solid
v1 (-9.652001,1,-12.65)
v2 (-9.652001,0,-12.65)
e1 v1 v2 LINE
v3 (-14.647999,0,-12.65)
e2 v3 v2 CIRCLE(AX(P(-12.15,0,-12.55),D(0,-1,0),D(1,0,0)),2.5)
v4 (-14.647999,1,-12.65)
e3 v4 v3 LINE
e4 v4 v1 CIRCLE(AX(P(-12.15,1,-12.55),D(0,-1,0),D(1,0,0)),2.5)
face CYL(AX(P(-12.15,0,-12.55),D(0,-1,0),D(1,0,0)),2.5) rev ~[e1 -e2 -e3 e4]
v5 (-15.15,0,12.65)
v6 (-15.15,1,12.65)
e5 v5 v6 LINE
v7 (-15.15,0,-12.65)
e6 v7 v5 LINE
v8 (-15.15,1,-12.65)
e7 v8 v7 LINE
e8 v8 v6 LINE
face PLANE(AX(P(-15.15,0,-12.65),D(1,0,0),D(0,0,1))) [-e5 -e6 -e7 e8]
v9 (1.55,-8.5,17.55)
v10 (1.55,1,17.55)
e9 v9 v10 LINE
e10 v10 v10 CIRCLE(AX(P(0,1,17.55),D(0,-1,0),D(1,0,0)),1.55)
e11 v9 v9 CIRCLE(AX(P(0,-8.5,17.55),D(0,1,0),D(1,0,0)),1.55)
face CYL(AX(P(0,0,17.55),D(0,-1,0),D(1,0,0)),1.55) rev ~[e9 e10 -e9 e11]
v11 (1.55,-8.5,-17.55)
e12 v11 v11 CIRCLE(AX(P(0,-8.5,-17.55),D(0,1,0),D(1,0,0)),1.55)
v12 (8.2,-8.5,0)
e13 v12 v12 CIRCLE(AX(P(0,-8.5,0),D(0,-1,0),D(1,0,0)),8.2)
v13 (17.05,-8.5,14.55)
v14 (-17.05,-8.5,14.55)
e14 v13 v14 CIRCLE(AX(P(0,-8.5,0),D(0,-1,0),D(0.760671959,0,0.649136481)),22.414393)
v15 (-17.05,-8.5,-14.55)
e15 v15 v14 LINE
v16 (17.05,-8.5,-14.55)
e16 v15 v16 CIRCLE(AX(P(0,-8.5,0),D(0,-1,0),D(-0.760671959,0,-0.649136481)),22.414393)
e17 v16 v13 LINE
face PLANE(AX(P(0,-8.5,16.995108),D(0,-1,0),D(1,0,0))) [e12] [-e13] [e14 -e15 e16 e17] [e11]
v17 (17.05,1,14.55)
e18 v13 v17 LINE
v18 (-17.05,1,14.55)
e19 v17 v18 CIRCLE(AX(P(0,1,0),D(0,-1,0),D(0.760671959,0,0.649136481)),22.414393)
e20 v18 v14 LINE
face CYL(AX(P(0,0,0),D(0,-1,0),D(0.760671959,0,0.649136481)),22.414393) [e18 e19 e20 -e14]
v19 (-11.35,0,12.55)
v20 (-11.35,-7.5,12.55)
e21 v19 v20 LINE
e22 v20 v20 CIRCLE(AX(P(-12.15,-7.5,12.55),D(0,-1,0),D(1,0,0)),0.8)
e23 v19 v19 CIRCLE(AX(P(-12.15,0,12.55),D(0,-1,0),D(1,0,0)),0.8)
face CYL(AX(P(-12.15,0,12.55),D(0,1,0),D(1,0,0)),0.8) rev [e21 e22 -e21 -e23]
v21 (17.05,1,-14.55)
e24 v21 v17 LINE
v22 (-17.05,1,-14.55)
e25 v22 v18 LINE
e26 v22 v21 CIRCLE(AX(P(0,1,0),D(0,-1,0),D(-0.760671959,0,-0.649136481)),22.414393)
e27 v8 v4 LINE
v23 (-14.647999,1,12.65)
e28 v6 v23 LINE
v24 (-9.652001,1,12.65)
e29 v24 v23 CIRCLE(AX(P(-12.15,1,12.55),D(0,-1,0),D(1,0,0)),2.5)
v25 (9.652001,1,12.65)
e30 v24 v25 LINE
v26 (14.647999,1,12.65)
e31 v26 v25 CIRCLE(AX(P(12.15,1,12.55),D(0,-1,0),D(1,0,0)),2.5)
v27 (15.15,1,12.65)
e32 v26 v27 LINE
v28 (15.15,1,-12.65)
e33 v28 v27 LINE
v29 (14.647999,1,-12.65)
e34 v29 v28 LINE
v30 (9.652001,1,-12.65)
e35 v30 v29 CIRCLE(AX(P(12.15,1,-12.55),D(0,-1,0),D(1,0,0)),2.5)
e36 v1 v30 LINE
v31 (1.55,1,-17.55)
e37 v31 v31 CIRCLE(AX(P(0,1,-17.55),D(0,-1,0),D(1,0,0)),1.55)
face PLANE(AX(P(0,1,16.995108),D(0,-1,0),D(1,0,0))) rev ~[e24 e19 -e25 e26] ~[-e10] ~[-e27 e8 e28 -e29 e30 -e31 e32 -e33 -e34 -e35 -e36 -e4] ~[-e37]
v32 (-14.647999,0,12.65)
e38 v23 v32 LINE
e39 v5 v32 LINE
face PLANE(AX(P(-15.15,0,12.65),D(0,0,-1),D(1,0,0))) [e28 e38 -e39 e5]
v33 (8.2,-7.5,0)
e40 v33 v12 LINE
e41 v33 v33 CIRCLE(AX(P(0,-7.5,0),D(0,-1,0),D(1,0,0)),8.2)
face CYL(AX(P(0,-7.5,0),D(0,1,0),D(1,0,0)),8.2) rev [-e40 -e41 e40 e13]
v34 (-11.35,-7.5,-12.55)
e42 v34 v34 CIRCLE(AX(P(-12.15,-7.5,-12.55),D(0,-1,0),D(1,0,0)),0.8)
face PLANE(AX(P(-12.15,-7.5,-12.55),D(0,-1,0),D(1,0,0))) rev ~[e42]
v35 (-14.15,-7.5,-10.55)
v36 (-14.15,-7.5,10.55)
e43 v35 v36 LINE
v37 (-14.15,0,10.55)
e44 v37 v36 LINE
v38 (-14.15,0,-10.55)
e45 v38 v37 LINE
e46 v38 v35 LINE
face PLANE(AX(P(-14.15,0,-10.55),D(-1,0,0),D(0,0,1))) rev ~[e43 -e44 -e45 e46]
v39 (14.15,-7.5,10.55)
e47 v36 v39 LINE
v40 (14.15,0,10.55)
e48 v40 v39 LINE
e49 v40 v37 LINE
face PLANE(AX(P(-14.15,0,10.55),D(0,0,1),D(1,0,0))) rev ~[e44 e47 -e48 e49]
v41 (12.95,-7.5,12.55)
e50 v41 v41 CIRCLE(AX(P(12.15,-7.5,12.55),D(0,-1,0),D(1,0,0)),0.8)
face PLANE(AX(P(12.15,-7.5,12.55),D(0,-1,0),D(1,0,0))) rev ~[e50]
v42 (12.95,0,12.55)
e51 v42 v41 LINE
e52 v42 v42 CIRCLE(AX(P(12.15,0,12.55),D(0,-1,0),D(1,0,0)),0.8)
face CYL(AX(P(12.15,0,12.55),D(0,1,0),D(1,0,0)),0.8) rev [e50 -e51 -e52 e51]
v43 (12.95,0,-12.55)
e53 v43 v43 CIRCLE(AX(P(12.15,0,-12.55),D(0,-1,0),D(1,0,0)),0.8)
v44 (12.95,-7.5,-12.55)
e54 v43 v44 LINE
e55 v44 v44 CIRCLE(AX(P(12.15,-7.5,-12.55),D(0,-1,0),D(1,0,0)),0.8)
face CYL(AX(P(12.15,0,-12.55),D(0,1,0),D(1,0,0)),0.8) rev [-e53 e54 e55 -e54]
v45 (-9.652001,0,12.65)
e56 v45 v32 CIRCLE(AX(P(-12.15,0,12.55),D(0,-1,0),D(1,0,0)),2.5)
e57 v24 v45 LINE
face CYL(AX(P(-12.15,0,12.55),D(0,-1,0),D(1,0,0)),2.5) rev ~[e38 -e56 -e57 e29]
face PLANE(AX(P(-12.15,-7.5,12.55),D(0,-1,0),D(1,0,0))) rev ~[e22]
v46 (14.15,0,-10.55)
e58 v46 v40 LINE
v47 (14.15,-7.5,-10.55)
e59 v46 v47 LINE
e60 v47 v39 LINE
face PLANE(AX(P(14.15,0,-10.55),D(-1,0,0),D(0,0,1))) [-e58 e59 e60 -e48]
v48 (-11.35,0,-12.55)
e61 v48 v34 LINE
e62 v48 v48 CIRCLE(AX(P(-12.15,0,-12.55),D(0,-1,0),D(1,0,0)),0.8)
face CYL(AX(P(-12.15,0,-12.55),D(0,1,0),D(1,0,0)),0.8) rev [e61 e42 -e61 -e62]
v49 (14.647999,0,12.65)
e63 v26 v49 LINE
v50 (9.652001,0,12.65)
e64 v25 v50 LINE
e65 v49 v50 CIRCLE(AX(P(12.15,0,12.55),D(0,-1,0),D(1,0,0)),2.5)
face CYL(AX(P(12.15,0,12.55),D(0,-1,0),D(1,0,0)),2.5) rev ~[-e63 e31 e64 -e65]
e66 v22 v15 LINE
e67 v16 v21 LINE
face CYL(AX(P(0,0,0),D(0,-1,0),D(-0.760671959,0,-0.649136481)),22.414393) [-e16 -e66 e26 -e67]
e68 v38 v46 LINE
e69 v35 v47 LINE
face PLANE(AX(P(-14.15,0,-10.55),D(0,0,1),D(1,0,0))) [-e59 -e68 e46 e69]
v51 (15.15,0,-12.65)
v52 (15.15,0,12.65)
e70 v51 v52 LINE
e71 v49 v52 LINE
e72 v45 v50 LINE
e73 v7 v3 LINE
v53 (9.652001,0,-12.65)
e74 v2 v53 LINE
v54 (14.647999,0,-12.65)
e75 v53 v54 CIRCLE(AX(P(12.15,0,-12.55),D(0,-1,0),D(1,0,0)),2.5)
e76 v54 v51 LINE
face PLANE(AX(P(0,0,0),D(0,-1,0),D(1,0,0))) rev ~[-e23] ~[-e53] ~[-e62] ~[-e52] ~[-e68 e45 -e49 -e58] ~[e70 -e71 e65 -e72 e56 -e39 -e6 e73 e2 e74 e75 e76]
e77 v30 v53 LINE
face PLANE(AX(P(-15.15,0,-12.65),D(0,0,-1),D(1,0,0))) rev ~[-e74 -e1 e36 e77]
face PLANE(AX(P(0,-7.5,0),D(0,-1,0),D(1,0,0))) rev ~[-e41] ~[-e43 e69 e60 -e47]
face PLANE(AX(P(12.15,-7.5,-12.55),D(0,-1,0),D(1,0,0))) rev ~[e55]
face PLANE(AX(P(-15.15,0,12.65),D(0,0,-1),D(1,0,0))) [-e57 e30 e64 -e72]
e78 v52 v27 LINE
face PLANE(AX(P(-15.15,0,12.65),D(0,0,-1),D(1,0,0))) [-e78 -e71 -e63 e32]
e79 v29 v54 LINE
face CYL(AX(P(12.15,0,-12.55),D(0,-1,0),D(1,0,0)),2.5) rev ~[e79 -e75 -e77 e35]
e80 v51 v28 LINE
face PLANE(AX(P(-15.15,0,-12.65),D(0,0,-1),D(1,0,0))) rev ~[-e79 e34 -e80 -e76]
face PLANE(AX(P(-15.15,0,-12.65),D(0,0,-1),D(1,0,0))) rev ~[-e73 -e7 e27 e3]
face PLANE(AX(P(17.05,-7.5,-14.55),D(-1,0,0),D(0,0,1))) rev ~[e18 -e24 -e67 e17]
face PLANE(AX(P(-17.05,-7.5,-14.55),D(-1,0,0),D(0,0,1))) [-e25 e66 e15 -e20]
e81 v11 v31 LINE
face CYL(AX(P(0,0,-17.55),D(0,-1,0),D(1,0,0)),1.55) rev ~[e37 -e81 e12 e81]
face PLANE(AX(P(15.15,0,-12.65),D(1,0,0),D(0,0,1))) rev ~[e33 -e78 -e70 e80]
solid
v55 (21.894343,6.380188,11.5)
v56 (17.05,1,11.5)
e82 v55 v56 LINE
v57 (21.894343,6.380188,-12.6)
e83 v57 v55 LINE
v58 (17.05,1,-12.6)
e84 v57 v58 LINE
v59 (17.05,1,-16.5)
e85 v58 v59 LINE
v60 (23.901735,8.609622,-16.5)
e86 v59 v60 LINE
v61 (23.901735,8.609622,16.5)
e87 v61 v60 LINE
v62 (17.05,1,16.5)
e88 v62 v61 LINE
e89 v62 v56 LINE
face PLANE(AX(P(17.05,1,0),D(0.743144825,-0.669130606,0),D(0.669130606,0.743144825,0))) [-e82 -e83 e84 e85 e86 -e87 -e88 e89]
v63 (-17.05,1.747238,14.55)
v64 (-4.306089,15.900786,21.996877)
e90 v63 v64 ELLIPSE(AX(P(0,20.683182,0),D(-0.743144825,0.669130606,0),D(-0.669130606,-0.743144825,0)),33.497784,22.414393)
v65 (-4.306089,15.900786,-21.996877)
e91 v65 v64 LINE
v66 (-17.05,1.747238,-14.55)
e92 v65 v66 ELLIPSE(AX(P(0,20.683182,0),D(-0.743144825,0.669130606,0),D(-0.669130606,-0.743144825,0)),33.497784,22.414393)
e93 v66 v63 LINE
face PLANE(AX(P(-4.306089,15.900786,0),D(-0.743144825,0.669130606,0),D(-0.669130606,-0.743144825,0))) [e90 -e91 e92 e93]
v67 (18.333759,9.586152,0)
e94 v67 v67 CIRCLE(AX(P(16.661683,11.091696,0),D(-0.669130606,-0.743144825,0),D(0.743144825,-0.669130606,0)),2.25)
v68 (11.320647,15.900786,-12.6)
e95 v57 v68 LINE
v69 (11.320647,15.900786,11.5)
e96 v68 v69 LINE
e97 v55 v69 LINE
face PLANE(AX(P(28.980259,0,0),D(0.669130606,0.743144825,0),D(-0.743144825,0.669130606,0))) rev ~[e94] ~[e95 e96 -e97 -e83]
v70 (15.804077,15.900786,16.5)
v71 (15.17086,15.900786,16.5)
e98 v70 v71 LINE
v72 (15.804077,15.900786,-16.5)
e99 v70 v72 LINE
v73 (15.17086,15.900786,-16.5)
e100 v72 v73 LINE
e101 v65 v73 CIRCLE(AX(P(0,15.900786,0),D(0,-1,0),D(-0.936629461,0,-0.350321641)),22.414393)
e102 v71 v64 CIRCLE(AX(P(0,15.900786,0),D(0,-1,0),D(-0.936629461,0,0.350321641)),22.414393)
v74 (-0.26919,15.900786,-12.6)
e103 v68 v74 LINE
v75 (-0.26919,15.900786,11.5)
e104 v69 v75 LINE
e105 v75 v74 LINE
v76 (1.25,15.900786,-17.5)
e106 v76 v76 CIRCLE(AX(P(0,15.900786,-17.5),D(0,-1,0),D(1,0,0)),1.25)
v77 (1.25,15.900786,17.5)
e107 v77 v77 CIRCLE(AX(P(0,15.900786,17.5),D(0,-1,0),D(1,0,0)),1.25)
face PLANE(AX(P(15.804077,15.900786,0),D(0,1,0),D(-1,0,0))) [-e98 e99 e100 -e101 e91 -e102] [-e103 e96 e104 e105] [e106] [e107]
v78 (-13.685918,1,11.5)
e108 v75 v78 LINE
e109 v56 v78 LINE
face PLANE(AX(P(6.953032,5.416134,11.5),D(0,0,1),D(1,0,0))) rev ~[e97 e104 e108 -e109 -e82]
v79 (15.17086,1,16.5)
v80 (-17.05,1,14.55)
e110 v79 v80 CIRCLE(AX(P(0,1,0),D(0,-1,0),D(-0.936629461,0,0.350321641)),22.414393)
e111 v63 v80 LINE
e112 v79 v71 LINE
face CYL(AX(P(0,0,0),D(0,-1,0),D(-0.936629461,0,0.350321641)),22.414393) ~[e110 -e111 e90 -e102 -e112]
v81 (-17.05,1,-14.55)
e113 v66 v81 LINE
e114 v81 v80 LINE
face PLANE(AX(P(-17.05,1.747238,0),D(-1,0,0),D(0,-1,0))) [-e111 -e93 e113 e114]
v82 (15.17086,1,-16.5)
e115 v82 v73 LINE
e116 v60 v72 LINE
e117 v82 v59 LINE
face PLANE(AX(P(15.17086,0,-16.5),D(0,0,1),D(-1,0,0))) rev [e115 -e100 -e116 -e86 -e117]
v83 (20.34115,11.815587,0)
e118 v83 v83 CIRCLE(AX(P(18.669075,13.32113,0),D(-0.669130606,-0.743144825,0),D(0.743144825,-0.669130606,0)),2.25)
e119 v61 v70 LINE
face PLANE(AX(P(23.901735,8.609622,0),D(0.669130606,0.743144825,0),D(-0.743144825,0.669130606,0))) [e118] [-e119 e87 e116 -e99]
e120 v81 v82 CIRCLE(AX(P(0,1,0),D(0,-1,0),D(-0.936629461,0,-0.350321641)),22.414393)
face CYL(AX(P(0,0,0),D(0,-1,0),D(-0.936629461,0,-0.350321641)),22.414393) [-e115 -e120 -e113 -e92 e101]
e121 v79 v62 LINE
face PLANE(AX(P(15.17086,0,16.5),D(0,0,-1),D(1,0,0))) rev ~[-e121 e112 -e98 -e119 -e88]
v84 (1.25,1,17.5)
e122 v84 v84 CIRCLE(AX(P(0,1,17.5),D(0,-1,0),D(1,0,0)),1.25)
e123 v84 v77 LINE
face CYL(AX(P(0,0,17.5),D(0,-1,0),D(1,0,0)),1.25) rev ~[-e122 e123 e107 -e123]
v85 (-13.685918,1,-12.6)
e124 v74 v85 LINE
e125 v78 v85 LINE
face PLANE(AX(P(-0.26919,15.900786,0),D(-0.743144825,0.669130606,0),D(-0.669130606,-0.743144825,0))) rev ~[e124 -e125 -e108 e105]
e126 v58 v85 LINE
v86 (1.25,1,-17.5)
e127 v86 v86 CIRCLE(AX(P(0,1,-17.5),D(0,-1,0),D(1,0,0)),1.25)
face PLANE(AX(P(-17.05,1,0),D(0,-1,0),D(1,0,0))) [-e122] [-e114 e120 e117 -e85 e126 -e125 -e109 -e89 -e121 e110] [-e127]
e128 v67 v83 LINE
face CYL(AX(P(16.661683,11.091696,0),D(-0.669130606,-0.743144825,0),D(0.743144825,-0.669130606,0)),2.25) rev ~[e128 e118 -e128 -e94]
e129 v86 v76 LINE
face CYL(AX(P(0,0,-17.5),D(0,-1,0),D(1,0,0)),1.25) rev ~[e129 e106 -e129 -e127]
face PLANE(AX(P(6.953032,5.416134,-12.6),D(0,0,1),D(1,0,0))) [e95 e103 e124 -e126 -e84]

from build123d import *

# Parameters (mm, degrees)
F2_W           = 34.1
F2_H           = 29.1
F2_W_2         = 30.3
F2_H_2         = 25.3
F3_DEPTH       = 7.5
F3_DEPTH_BACK  = 1
F4_W           = 34.1
F4_H           = 29.1
F4_R           = 8.2
F5_DEPTH       = 1
F6_W           = 30.3
F6_H           = 25.3
F6_W_2         = 28.3
F6_H_2         = 21.1
F7_DEPTH       = 7.5
F9_DEPTH       = 8.5
F9_DEPTH_BACK  = 1
F10_R          = 1.55
F11_DEPTH      = 1.001
F11_DEPTH_BACK = 8.501
F12_R          = 2.5
F13_DEPTH      = 25
F14_R          = 0.8
F15_DEPTH      = 7.5
F18_DEPTH      = 22.5
F20_DEPTH      = 12.6
F20_DEPTH_BACK = 11.5
F21_R          = 2.25
F22_DEPTH      = 8.4193905153
F23_R          = 1.25
F24_DEPTH      = 15.9017858469
F26_DEPTH      = 15.9017858469


# Not quite as in the source:
# - a pattern or mirror of a feature is missing from the dataset's text; its kind, count and spacing are read off the source's solid


with BuildPart() as f3:
    # F2 (on Front) → F3 (new body, two sides)
    with BuildSketch(Plane.XZ) as f3_sk:
        Rectangle(F2_W, F2_H)
        Rectangle(F2_W_2, F2_H_2, mode=Mode.SUBTRACT)
    extrude(amount=F3_DEPTH)
    extrude(f3_sk.sketch, amount=-F3_DEPTH_BACK)

    # F4 (on face) → F5 (join)
    with BuildSketch(Plane.XZ.offset(7.5)):
        Rectangle(F4_W, F4_H)
        Circle(F4_R, mode=Mode.SUBTRACT)
    extrude(amount=F5_DEPTH)

    # F6 (on Front) → F7 (join, through all)
    with BuildSketch(Plane.XZ):
        Rectangle(F6_W, F6_H)
        Rectangle(F6_W_2, F6_H_2, mode=Mode.SUBTRACT)
    extrude(amount=F7_DEPTH)

    # F8 (on Front) → F9 (join, two sides)
    with BuildSketch(Plane.XZ) as f9_sk:
        with BuildLine():
            ThreePointArc((17.05, 14.55), (0, 22.4143926976), (-17.05, 14.55))
            Line((-17.05, 14.55), (17.05, 14.55))
        make_face()
        with BuildLine():
            ThreePointArc((-17.05, -14.55), (0, -22.4143926976), (17.05, -14.55))
            Line((17.05, -14.55), (-17.05, -14.55))
        make_face()
    extrude(amount=F9_DEPTH)
    extrude(f9_sk.sketch, amount=-F9_DEPTH_BACK)

    # F10 (on Front) → F11 (cut, two sides)
    with BuildSketch(Plane.XZ) as f11_sk:
        with Locations((0, 17.55)):
            Circle(F10_R)
        with Locations((0, -17.55)):
            Circle(F10_R)
    extrude(amount=-F11_DEPTH, mode=Mode.SUBTRACT)
    extrude(f11_sk.sketch, amount=F11_DEPTH_BACK, mode=Mode.SUBTRACT)

    # F12 (on face) → F13 (cut)
    with BuildSketch(Plane.XZ):
        with Locations((12.15, 12.55)):
            Circle(F12_R)
        with Locations((-12.15, 12.55)):
            Circle(F12_R)
        with Locations((-12.15, -12.55)):
            Circle(F12_R)
        with Locations((12.15, -12.55)):
            Circle(F12_R)
    extrude(amount=-F13_DEPTH, mode=Mode.SUBTRACT)

    # F14 (on Front) → F15 (cut, through all)
    with BuildSketch(Plane.XZ):
        with Locations((12.15, 12.55)):
            Circle(F14_R)
        with Locations((-12.15, 12.55)):
            Circle(F14_R)
        with Locations((-12.15, -12.55)):
            Circle(F14_R)
        with Locations((12.15, -12.55)):
            Circle(F14_R)
    extrude(amount=F15_DEPTH, mode=Mode.SUBTRACT)


with BuildPart() as f18:
    # F17 (on Top) → F18 (new body, symmetric)
    with BuildSketch(Plane.XY):
        Polygon((15.8040770662, 15.9007858469), (-4.3060885251, 15.9007858469), (-17.05, 1.7472382749), (-17.05, 1), (17.05, 1), (23.9017346294, 8.6096222277), align=None)
    extrude(amount=F18_DEPTH, both=True)

    # F19 (on Top) → F20 (cut, two sides)
    with BuildSketch(Plane.XY) as f20_sk:
        Polygon((-14.5863222203, 0), (28.9802591738, 0), (11.3206474166, 15.9007858469), (-0.2691903362, 15.9007858469), align=None)
        Polygon((-14.8685498887, -0.3134455806), (-14.5863222203, 0), (-15.2166664732, 0), align=None)
    extrude(amount=-F20_DEPTH, mode=Mode.SUBTRACT)
    extrude(f20_sk.sketch, amount=F20_DEPTH_BACK, mode=Mode.SUBTRACT)

    # F21 (on face) → F22 (cut, through all)
    with BuildSketch(Plane(origin=(12.9754986086, 14.4107511409, 0), x_dir=(0.7431448255, -0.6691306064, 0), z_dir=(-0.6691306064, -0.7431448255, 0))):
        with Locations((4.9602501193, 0)):
            Circle(F21_R)
    extrude(amount=-F22_DEPTH, mode=Mode.SUBTRACT)

    # F23 (on Front) → F24 (cut, through all)
    with BuildSketch(Plane.XZ):
        with Locations((0, 17.5)):
            Circle(F23_R)
        with Locations((0, -17.5)):
            Circle(F23_R)
    extrude(amount=-F24_DEPTH, mode=Mode.SUBTRACT)

    # F25 (on Front) → F26 (cut, through all)
    with BuildSketch(Plane.XZ):
        with BuildLine():
            Line((-20.9939805572, 29.1438214481), (-20.9939805572, 7.8522468355))
            ThreePointArc((-20.9939805572, 7.8522468355), (-5.2127815316, 21.799814419), (15.1708602261, 16.5))
            Line((15.1708602261, 16.5), (34.9690280855, 16.5))
            Line((34.9690280855, 16.5), (34.9690280855, 29.1438214481))
            Line((34.9690280855, 29.1438214481), (-20.9939805572, 29.1438214481))
        make_face()
    f26 = extrude(amount=-F26_DEPTH, mode=Mode.SUBTRACT)

    # F26_copies: F26 across plane
    add(f26.mirror(Plane(origin=(0, 0, 0), x_dir=(-1, 0, 0), z_dir=(0, 0, -1))), mode=Mode.SUBTRACT)


solid = Compound([f3.part, f18.part])
